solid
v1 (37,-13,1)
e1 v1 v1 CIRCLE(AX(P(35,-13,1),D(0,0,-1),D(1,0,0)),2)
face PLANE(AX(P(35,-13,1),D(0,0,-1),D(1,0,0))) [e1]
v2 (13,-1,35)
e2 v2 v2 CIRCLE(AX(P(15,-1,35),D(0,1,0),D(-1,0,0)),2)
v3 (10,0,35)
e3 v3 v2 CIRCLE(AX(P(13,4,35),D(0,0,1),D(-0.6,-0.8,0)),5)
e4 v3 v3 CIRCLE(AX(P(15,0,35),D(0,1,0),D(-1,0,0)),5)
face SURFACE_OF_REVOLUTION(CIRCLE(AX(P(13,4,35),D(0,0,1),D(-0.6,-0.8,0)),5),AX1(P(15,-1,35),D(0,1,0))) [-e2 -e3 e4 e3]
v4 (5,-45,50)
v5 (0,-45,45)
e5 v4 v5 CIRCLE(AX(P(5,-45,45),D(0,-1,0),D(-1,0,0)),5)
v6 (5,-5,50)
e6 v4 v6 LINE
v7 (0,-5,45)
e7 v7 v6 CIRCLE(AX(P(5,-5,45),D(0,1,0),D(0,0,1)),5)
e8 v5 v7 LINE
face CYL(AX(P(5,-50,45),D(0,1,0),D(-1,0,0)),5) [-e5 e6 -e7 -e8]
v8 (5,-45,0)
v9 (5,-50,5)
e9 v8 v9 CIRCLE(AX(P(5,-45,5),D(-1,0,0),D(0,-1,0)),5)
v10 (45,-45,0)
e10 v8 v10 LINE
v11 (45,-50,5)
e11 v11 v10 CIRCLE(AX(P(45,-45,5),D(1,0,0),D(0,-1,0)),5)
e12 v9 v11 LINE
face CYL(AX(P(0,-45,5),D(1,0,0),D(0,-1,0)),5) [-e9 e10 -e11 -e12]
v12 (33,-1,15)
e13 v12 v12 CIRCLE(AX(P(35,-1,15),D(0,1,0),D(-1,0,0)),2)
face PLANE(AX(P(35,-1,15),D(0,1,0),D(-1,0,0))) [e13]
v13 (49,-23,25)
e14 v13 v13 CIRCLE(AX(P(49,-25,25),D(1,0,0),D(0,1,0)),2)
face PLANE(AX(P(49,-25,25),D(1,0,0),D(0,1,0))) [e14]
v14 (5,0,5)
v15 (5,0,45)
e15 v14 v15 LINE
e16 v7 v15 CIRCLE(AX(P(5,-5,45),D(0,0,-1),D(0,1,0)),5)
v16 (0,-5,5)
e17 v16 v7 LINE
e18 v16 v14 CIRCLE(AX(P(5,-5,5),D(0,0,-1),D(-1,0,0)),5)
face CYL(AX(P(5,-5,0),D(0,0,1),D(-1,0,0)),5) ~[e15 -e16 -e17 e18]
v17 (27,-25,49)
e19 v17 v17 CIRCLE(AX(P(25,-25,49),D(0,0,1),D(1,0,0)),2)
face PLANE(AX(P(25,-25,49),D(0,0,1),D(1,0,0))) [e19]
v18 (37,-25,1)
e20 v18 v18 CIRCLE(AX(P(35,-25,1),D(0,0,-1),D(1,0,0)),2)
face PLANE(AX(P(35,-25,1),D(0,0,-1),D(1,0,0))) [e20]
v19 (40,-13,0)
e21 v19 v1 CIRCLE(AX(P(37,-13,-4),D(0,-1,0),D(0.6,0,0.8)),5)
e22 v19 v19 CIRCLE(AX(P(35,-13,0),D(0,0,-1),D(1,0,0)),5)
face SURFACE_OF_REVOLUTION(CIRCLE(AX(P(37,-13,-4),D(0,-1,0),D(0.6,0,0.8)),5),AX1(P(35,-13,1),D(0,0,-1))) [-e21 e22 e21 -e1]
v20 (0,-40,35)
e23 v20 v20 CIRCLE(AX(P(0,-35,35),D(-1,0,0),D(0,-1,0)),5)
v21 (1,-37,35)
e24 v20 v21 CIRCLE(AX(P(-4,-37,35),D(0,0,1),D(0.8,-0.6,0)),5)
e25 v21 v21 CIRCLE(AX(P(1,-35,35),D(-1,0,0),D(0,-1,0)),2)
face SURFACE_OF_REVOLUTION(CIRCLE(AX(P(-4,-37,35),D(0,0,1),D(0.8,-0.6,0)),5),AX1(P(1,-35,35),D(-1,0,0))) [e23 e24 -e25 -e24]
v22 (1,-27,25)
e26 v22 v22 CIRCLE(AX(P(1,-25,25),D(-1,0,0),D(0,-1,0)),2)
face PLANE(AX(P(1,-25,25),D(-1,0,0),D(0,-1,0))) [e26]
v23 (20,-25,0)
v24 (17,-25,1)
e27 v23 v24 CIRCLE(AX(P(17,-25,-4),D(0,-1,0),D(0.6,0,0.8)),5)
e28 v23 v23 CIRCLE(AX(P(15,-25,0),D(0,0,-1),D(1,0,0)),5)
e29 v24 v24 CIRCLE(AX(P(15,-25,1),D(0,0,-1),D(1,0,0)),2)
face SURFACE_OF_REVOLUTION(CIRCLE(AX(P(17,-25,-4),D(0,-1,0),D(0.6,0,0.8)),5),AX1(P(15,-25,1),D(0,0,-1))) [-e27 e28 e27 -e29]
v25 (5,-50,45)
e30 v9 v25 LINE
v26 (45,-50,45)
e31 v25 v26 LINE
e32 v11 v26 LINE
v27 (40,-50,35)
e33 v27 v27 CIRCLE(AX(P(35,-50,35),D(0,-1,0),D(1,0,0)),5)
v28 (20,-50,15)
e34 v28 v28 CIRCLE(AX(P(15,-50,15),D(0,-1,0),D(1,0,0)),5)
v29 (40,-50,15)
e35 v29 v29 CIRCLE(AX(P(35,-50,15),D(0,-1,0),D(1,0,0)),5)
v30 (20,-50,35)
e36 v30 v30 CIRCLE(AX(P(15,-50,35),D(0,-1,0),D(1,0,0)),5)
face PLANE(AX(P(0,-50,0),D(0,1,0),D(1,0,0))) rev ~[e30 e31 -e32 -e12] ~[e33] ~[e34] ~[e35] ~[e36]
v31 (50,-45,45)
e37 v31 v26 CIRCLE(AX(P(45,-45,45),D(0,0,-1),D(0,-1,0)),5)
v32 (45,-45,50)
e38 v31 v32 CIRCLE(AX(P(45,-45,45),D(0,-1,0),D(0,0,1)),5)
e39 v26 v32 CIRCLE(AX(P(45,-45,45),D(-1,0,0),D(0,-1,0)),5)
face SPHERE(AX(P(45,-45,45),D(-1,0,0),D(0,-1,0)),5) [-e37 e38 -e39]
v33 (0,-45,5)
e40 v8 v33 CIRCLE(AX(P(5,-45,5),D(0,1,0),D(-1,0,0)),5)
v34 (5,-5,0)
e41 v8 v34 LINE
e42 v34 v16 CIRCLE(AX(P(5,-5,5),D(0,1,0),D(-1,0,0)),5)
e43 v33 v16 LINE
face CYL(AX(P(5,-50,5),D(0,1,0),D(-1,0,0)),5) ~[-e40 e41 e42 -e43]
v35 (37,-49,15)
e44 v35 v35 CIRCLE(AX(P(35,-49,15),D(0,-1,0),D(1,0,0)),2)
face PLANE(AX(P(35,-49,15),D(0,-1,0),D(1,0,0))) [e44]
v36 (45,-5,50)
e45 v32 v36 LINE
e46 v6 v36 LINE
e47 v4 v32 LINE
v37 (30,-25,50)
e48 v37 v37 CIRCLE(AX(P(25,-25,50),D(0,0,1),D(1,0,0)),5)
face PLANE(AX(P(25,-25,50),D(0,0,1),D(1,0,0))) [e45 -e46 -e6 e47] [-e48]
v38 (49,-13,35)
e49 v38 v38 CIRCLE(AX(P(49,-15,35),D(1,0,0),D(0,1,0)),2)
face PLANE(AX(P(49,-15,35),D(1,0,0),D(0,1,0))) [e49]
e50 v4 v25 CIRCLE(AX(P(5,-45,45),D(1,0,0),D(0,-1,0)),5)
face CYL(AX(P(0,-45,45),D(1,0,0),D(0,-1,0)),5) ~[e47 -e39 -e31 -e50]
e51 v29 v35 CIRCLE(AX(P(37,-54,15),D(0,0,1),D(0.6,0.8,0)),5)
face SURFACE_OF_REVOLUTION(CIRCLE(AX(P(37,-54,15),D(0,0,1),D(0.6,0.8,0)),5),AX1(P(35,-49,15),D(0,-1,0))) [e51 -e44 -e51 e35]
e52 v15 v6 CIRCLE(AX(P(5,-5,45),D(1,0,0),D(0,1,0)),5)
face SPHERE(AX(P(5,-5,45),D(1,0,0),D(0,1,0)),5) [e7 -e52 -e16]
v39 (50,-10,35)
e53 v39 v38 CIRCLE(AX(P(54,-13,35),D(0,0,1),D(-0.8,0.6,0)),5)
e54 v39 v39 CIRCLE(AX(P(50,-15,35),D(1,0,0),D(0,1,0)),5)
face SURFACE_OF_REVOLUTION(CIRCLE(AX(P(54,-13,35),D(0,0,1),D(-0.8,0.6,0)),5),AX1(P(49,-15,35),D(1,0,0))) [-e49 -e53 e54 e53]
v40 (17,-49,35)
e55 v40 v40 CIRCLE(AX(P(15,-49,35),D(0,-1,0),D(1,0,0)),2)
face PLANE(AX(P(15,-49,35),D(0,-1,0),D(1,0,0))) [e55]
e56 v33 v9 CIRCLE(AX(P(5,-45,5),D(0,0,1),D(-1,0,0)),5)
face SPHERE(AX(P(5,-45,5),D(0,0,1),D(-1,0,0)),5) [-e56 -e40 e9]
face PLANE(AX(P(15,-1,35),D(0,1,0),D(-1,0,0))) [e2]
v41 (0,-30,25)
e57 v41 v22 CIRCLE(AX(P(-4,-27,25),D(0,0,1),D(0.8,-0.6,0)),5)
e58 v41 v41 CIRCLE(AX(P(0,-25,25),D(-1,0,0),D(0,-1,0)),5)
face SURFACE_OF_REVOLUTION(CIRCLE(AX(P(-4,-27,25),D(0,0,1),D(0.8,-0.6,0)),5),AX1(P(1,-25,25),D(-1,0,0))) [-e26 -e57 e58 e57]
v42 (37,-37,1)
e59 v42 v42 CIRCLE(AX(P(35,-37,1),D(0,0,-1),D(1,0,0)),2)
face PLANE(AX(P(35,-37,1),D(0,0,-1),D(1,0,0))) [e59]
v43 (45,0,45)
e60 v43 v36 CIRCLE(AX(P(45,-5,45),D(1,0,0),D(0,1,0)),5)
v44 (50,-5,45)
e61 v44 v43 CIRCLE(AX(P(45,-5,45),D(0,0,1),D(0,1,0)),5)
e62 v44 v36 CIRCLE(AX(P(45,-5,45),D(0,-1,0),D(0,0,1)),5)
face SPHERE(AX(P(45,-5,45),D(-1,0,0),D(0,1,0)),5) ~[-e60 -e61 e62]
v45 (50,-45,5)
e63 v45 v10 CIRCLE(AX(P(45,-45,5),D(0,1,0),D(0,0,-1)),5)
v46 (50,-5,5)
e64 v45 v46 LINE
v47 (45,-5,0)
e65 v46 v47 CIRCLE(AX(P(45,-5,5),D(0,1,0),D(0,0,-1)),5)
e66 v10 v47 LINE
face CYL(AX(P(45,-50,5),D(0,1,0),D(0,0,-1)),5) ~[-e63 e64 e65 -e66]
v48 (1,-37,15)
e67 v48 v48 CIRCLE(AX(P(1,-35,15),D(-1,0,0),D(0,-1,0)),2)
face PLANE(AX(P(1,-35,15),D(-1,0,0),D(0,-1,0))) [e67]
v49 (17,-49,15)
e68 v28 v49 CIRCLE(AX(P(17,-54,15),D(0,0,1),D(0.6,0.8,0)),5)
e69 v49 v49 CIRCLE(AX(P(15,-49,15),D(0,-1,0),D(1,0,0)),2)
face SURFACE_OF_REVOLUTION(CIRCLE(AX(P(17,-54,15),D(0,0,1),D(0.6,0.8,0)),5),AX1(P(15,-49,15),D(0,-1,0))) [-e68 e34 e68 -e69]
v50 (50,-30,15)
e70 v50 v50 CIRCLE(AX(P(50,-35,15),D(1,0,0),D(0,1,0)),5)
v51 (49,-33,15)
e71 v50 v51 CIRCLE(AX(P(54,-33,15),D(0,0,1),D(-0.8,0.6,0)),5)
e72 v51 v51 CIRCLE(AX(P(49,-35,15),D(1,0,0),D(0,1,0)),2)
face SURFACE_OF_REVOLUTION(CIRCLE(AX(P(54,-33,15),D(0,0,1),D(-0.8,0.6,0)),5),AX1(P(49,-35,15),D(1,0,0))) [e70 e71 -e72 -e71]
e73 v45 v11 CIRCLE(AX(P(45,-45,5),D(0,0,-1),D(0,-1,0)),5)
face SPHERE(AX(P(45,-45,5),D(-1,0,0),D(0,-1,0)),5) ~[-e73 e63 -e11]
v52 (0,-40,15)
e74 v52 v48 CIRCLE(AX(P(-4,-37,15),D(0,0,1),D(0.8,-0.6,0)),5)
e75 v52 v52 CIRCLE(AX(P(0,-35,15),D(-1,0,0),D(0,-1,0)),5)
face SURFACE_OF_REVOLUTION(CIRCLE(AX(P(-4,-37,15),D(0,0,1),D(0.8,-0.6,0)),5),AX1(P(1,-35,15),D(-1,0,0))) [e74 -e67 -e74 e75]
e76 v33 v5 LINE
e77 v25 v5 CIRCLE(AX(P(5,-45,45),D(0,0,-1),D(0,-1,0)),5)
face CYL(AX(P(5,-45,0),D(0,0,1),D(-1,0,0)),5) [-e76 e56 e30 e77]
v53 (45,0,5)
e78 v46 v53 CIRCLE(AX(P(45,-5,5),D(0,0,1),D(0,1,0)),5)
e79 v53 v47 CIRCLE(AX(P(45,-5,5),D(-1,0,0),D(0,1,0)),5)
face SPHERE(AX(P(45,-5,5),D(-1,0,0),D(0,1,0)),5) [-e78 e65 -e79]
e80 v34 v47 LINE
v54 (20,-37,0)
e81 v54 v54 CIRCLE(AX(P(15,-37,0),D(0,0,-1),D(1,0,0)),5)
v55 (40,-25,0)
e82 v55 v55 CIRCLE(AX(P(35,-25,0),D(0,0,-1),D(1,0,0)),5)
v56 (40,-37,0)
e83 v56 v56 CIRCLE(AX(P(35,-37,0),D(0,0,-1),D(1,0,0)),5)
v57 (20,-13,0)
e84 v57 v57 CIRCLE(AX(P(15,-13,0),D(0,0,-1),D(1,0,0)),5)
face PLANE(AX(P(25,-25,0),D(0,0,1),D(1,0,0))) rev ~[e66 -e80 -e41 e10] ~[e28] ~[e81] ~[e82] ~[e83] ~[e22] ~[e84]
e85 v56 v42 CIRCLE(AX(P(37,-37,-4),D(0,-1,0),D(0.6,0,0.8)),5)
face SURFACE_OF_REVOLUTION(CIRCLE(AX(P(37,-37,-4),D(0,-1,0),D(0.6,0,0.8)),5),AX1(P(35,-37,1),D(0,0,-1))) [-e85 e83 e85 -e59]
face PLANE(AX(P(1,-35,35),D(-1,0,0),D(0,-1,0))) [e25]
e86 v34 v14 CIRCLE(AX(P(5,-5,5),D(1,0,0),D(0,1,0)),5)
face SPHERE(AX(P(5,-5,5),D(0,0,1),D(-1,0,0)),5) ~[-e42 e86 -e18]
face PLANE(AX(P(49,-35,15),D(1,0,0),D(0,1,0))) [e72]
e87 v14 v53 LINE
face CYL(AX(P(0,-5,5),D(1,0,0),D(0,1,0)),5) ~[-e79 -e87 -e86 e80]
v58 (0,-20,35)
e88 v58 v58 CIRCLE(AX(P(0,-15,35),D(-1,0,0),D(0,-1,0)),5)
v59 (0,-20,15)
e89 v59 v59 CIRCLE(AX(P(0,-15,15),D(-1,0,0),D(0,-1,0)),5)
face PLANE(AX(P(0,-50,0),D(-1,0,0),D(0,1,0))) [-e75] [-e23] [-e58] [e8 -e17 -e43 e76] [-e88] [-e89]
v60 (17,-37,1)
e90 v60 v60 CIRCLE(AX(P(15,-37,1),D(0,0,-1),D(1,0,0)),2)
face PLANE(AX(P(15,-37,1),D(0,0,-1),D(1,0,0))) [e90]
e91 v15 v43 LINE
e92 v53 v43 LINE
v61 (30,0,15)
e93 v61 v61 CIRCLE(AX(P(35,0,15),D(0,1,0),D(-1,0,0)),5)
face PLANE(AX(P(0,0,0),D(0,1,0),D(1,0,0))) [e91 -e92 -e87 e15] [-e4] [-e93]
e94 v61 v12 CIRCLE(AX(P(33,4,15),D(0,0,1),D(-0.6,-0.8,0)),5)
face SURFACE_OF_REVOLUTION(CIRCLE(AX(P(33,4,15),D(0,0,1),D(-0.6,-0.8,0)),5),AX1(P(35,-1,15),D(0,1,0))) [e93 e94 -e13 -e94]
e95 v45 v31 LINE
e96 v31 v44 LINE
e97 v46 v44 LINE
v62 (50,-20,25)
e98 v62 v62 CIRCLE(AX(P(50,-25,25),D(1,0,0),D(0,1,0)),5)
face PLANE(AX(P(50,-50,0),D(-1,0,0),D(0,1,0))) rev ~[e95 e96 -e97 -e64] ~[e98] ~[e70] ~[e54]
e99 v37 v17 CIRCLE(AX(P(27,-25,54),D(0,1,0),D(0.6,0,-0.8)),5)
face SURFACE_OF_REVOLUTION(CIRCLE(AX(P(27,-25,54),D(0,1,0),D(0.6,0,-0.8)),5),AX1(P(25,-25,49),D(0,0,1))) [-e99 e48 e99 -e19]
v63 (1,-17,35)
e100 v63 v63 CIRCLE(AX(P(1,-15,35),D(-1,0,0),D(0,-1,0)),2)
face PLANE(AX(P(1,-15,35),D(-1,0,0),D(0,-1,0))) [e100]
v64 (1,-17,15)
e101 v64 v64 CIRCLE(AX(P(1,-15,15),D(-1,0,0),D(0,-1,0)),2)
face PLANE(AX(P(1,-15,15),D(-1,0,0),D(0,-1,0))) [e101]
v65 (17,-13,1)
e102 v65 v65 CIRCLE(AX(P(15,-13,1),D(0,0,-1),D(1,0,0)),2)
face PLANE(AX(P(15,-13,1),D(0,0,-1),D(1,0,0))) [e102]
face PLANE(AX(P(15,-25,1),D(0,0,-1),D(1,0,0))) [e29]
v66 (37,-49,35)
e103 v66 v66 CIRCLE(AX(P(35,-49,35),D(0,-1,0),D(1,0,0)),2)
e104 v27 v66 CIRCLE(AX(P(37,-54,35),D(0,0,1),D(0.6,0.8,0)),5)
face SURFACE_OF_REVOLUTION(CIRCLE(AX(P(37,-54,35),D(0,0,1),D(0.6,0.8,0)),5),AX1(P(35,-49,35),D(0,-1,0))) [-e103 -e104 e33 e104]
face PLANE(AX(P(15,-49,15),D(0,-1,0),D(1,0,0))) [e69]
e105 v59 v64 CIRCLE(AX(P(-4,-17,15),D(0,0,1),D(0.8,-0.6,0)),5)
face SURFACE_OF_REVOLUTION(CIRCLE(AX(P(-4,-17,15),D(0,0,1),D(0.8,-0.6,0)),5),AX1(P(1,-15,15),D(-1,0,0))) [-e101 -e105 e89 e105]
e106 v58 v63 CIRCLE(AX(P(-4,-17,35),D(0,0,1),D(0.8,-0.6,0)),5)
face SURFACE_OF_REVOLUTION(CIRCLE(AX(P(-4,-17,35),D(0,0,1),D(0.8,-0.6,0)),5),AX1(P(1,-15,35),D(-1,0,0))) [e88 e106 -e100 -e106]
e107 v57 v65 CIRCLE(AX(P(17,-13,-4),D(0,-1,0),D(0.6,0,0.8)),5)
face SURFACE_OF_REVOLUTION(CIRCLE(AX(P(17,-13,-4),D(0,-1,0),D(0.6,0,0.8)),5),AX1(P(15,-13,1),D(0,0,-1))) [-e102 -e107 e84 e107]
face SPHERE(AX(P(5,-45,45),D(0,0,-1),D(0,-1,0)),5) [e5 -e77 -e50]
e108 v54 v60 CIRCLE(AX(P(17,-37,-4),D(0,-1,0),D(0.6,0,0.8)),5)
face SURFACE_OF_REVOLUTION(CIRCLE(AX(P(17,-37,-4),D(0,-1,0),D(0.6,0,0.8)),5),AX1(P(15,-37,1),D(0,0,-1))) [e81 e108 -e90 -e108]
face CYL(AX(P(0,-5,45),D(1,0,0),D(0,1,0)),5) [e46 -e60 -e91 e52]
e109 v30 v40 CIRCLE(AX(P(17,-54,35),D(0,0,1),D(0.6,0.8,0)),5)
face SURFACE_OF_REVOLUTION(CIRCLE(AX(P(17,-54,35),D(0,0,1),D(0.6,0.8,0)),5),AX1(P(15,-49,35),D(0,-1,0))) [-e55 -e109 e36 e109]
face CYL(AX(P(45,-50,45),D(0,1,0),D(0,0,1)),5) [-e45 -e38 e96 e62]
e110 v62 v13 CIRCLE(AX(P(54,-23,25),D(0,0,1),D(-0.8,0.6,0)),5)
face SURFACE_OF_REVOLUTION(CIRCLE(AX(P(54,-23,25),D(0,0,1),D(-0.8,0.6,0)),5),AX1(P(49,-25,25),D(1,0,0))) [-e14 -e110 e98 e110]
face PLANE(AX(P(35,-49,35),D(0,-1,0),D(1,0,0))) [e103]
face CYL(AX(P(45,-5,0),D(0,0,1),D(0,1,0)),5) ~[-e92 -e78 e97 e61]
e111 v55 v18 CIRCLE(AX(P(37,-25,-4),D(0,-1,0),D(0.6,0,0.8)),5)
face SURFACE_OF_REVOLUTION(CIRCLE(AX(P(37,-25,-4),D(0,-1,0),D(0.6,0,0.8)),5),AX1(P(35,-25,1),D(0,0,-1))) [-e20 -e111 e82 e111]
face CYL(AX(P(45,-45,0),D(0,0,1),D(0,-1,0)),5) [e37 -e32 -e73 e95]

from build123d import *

# Parameters (mm, degrees)
F0_W      = 50
F0_H      = 50
F1_DEPTH  = 50
F2_R      = 5
F3_DEPTH  = 1
F4_R      = 5
F6_R      = 5
F7_DEPTH  = 1
F9_R      = 5
F10_DEPTH = 1
F12_R     = 5
F13_DEPTH = 1
F15_R     = 5
F16_DEPTH = 1
F18_R     = 5
F19_DEPTH = 1
F21_DEPTH = 0.5


# Not quite as in the source:
# - a fillet or chamfer that OpenCascade refuses, or shapes differently, is made with other operations: its cross-section is extruded or revolved along the edge and cut away or added
# - a feature names something its author has since deleted; it is built from what else it names


with BuildPart() as f1:
    # F0 (on Top) → F1 (new body)
    with BuildSketch(Plane.XY):
        with Locations((25, -25)):
            Rectangle(F0_W, F0_H)
    extrude(amount=F1_DEPTH)

    # F2 (on face) → F3 (cut)
    with BuildSketch(Plane.XY.offset(50)):
        with Locations((25, -25)):
            Circle(F2_R)
    extrude(amount=-F3_DEPTH, mode=Mode.SUBTRACT)

    # F4
    f4_edges = [f1.edges().sort_by_distance(p)[0] for p in [
        (0, -50, 25),
        (25, -50, 50),
        (25, 0, 50),
        (0, 0, 25),
        (0, -25, 0),
        (0, -25, 50),
        (25, -50, 0),
        (50, -50, 25),
        (25, 0, 0),
        (50, 0, 25),
        (50, -25, 0),
        (50, -25, 50),
    ]]
    fillet(f4_edges, radius=F4_R)

    # F5: fillet of radius 5 on 1 edges, made by hand

    # F5_s1 → F5_t2 (revolve)
    with BuildSketch(Plane.XZ.offset(25)):
        with BuildLine():
            ThreePointArc((30, 50), (28.5811388301, 49.2565835097), (27, 49))
            Line((27, 49), (30, 49))
            Line((30, 49), (30, 50))
        make_face()
    revolve(axis=Axis((25, -25, 49), (0, 0, 1)))

    # F6 (on face) → F7 (cut)
    with BuildSketch(Plane.XZ.offset(50)):
        with Locations((15, 35)):
            Circle(F6_R)
        with Locations((35, 35)):
            Circle(F6_R)
        with Locations((35, 15)):
            Circle(F6_R)
        with Locations((15, 15)):
            Circle(F6_R)
    extrude(amount=-F7_DEPTH, mode=Mode.SUBTRACT)

    # F8: fillet of radius 5 on 4 edges, made by hand

    # F8_s1 → F8_t2 (revolve)
    with BuildSketch(Plane.XY.offset(35)):
        with BuildLine():
            ThreePointArc((20, -50), (18.5811388301, -49.2565835097), (17, -49))
            Line((17, -49), (20, -49))
            Line((20, -49), (20, -50))
        make_face()
    revolve(axis=Axis((15, -49, 35), (0, -1, 0)))

    # F8_s3 → F8_t4 (revolve)
    with BuildSketch(Plane.XY.offset(35)):
        with BuildLine():
            ThreePointArc((40, -50), (38.5811388301, -49.2565835097), (37, -49))
            Line((37, -49), (40, -49))
            Line((40, -49), (40, -50))
        make_face()
    revolve(axis=Axis((35, -49, 35), (0, -1, 0)))

    # F8_s5 → F8_t6 (revolve)
    with BuildSketch(Plane.XY.offset(15)):
        with BuildLine():
            ThreePointArc((20, -50), (18.5811388301, -49.2565835097), (17, -49))
            Line((17, -49), (20, -49))
            Line((20, -49), (20, -50))
        make_face()
    revolve(axis=Axis((15, -49, 15), (0, -1, 0)))

    # F8_s7 → F8_t8 (revolve)
    with BuildSketch(Plane.XY.offset(15)):
        with BuildLine():
            ThreePointArc((40, -50), (38.5811388301, -49.2565835097), (37, -49))
            Line((37, -49), (40, -49))
            Line((40, -49), (40, -50))
        make_face()
    revolve(axis=Axis((35, -49, 15), (0, -1, 0)))

    # F9 (on face) → F10 (cut)
    with BuildSketch(Plane(origin=(0, 0, 0), x_dir=(-1, 0, 0), z_dir=(0, 1, 0))):
        with Locations((-35, 15)):
            Circle(F9_R)
        with Locations((-15, 35)):
            Circle(F9_R)
    extrude(amount=-F10_DEPTH, mode=Mode.SUBTRACT)

    # F11: fillet of radius 5 on 2 edges, made by hand

    # F11_s1 → F11_t2 (revolve)
    with BuildSketch(Plane.XY.offset(15)):
        with BuildLine():
            ThreePointArc((30, 0), (31.4188611699, -0.7434164903), (33, -1))
            Line((33, -1), (30, -1))
            Line((30, -1), (30, 0))
        make_face()
    revolve(axis=Axis((35, -1, 15), (0, 1, 0)))

    # F11_s3 → F11_t4 (revolve)
    with BuildSketch(Plane.XY.offset(35)):
        with BuildLine():
            ThreePointArc((10, 0), (11.4188611699, -0.7434164903), (13, -1))
            Line((13, -1), (10, -1))
            Line((10, -1), (10, 0))
        make_face()
    revolve(axis=Axis((15, -1, 35), (0, 1, 0)))

    # F12 (on face) → F13 (cut)
    with BuildSketch(Plane.YZ.offset(50)):
        with Locations((-15, 35)):
            Circle(F12_R)
        with Locations((-25, 25)):
            Circle(F12_R)
        with Locations((-35, 15)):
            Circle(F12_R)
    extrude(amount=-F13_DEPTH, mode=Mode.SUBTRACT)

    # F14: fillet of radius 5 on 3 edges, made by hand

    # F14_s1 → F14_t2 (revolve)
    with BuildSketch(Plane.XY.offset(15)):
        with BuildLine():
            ThreePointArc((50, -30), (49.2565835097, -31.4188611699), (49, -33))
            Line((49, -33), (49, -30))
            Line((49, -30), (50, -30))
        make_face()
    revolve(axis=Axis((49, -35, 15), (1, 0, 0)))

    # F14_s3 → F14_t4 (revolve)
    with BuildSketch(Plane.XY.offset(25)):
        with BuildLine():
            ThreePointArc((50, -20), (49.2565835097, -21.4188611699), (49, -23))
            Line((49, -23), (49, -20))
            Line((49, -20), (50, -20))
        make_face()
    revolve(axis=Axis((49, -25, 25), (1, 0, 0)))

    # F14_s5 → F14_t6 (revolve)
    with BuildSketch(Plane.XY.offset(35)):
        with BuildLine():
            ThreePointArc((50, -10), (49.2565835097, -11.4188611699), (49, -13))
            Line((49, -13), (49, -10))
            Line((49, -10), (50, -10))
        make_face()
    revolve(axis=Axis((49, -15, 35), (1, 0, 0)))

    # F15 (on face) → F16 (cut)
    with BuildSketch(Plane(origin=(0, 0, 0), x_dir=(0, -1, 0), z_dir=(-1, 0, 0))):
        with Locations((15, 35)):
            Circle(F15_R)
        with Locations((25, 25)):
            Circle(F15_R)
        with Locations((15, 15)):
            Circle(F15_R)
        with Locations((35, 15)):
            Circle(F15_R)
        with Locations((35, 35)):
            Circle(F15_R)
    extrude(amount=-F16_DEPTH, mode=Mode.SUBTRACT)

    # F17: fillet of radius 5 on 5 edges, made by hand

    # F17_s1 → F17_t2 (revolve)
    with BuildSketch(Plane.XY.offset(35)):
        with BuildLine():
            ThreePointArc((0, -20), (0.7434164903, -18.5811388301), (1, -17))
            Line((1, -17), (1, -20))
            Line((1, -20), (0, -20))
        make_face()
    revolve(axis=Axis((1, -15, 35), (-1, 0, 0)))

    # F17_s3 → F17_t4 (revolve)
    with BuildSketch(Plane.XY.offset(25)):
        with BuildLine():
            ThreePointArc((0, -30), (0.7434164903, -28.5811388301), (1, -27))
            Line((1, -27), (1, -30))
            Line((1, -30), (0, -30))
        make_face()
    revolve(axis=Axis((1, -25, 25), (-1, 0, 0)))

    # F17_s5 → F17_t6 (revolve)
    with BuildSketch(Plane.XY.offset(15)):
        with BuildLine():
            ThreePointArc((0, -40), (0.7434164903, -38.5811388301), (1, -37))
            Line((1, -37), (1, -40))
            Line((1, -40), (0, -40))
        make_face()
    revolve(axis=Axis((1, -35, 15), (-1, 0, 0)))

    # F17_s7 → F17_t8 (revolve)
    with BuildSketch(Plane.XY.offset(35)):
        with BuildLine():
            ThreePointArc((0, -40), (0.7434164903, -38.5811388301), (1, -37))
            Line((1, -37), (1, -40))
            Line((1, -40), (0, -40))
        make_face()
    revolve(axis=Axis((1, -35, 35), (-1, 0, 0)))

    # F17_s9 → F17_t10 (revolve)
    with BuildSketch(Plane.XY.offset(15)):
        with BuildLine():
            ThreePointArc((0, -20), (0.7434164903, -18.5811388301), (1, -17))
            Line((1, -17), (1, -20))
            Line((1, -20), (0, -20))
        make_face()
    revolve(axis=Axis((1, -15, 15), (-1, 0, 0)))

    # F18 (on face) → F19 (cut)
    with BuildSketch(Plane(origin=(0, 0, 0), x_dir=(1, 0, 0), z_dir=(0, 0, -1))):
        with Locations((15, 37)):
            Circle(F18_R)
        with Locations((15, 25)):
            Circle(F18_R)
        with Locations((15, 13)):
            Circle(F18_R)
        with Locations((35, 37)):
            Circle(F18_R)
        with Locations((35, 13)):
            Circle(F18_R)
        with Locations((35, 25)):
            Circle(F18_R)
    extrude(amount=-F19_DEPTH, mode=Mode.SUBTRACT)

    # F20: fillet of radius 5 on 6 edges, made by hand

    # F20_s1 → F20_t2 (revolve)
    with BuildSketch(Plane.XZ.offset(25)):
        with BuildLine():
            ThreePointArc((40, 0), (38.5811388301, 0.7434164903), (37, 1))
            Line((37, 1), (40, 1))
            Line((40, 1), (40, 0))
        make_face()
    revolve(axis=Axis((35, -25, 1), (0, 0, -1)))

    # F20_s3 → F20_t4 (revolve)
    with BuildSketch(Plane.XZ.offset(25)):
        with BuildLine():
            ThreePointArc((20, 0), (18.5811388301, 0.7434164903), (17, 1))
            Line((17, 1), (20, 1))
            Line((20, 1), (20, 0))
        make_face()
    revolve(axis=Axis((15, -25, 1), (0, 0, -1)))

    # F20_s5 → F20_t6 (revolve)
    with BuildSketch(Plane.XZ.offset(37)):
        with BuildLine():
            ThreePointArc((20, 0), (18.5811388301, 0.7434164903), (17, 1))
            Line((17, 1), (20, 1))
            Line((20, 1), (20, 0))
        make_face()
    revolve(axis=Axis((15, -37, 1), (0, 0, -1)))

    # F20_s7 → F20_t8 (revolve)
    with BuildSketch(Plane.XZ.offset(13)):
        with BuildLine():
            ThreePointArc((20, 0), (18.5811388301, 0.7434164903), (17, 1))
            Line((17, 1), (20, 1))
            Line((20, 1), (20, 0))
        make_face()
    revolve(axis=Axis((15, -13, 1), (0, 0, -1)))

    # F20_s9 → F20_t10 (revolve)
    with BuildSketch(Plane.XZ.offset(13)):
        with BuildLine():
            ThreePointArc((40, 0), (38.5811388301, 0.7434164903), (37, 1))
            Line((37, 1), (40, 1))
            Line((40, 1), (40, 0))
        make_face()
    revolve(axis=Axis((35, -13, 1), (0, 0, -1)))

    # F20_s11 → F20_t12 (revolve)
    with BuildSketch(Plane.XZ.offset(37)):
        with BuildLine():
            ThreePointArc((40, 0), (38.5811388301, 0.7434164903), (37, 1))
            Line((37, 1), (40, 1))
            Line((40, 1), (40, 0))
        make_face()
    revolve(axis=Axis((35, -37, 1), (0, 0, -1)))

    # F21 (add): a face of the model
    f21_faces = [f1.faces().sort_by_distance(p)[0] for p in [
        (25, -25, 0),
    ]]
    extrude(f21_faces, amount=-F21_DEPTH)


solid = f1.part
